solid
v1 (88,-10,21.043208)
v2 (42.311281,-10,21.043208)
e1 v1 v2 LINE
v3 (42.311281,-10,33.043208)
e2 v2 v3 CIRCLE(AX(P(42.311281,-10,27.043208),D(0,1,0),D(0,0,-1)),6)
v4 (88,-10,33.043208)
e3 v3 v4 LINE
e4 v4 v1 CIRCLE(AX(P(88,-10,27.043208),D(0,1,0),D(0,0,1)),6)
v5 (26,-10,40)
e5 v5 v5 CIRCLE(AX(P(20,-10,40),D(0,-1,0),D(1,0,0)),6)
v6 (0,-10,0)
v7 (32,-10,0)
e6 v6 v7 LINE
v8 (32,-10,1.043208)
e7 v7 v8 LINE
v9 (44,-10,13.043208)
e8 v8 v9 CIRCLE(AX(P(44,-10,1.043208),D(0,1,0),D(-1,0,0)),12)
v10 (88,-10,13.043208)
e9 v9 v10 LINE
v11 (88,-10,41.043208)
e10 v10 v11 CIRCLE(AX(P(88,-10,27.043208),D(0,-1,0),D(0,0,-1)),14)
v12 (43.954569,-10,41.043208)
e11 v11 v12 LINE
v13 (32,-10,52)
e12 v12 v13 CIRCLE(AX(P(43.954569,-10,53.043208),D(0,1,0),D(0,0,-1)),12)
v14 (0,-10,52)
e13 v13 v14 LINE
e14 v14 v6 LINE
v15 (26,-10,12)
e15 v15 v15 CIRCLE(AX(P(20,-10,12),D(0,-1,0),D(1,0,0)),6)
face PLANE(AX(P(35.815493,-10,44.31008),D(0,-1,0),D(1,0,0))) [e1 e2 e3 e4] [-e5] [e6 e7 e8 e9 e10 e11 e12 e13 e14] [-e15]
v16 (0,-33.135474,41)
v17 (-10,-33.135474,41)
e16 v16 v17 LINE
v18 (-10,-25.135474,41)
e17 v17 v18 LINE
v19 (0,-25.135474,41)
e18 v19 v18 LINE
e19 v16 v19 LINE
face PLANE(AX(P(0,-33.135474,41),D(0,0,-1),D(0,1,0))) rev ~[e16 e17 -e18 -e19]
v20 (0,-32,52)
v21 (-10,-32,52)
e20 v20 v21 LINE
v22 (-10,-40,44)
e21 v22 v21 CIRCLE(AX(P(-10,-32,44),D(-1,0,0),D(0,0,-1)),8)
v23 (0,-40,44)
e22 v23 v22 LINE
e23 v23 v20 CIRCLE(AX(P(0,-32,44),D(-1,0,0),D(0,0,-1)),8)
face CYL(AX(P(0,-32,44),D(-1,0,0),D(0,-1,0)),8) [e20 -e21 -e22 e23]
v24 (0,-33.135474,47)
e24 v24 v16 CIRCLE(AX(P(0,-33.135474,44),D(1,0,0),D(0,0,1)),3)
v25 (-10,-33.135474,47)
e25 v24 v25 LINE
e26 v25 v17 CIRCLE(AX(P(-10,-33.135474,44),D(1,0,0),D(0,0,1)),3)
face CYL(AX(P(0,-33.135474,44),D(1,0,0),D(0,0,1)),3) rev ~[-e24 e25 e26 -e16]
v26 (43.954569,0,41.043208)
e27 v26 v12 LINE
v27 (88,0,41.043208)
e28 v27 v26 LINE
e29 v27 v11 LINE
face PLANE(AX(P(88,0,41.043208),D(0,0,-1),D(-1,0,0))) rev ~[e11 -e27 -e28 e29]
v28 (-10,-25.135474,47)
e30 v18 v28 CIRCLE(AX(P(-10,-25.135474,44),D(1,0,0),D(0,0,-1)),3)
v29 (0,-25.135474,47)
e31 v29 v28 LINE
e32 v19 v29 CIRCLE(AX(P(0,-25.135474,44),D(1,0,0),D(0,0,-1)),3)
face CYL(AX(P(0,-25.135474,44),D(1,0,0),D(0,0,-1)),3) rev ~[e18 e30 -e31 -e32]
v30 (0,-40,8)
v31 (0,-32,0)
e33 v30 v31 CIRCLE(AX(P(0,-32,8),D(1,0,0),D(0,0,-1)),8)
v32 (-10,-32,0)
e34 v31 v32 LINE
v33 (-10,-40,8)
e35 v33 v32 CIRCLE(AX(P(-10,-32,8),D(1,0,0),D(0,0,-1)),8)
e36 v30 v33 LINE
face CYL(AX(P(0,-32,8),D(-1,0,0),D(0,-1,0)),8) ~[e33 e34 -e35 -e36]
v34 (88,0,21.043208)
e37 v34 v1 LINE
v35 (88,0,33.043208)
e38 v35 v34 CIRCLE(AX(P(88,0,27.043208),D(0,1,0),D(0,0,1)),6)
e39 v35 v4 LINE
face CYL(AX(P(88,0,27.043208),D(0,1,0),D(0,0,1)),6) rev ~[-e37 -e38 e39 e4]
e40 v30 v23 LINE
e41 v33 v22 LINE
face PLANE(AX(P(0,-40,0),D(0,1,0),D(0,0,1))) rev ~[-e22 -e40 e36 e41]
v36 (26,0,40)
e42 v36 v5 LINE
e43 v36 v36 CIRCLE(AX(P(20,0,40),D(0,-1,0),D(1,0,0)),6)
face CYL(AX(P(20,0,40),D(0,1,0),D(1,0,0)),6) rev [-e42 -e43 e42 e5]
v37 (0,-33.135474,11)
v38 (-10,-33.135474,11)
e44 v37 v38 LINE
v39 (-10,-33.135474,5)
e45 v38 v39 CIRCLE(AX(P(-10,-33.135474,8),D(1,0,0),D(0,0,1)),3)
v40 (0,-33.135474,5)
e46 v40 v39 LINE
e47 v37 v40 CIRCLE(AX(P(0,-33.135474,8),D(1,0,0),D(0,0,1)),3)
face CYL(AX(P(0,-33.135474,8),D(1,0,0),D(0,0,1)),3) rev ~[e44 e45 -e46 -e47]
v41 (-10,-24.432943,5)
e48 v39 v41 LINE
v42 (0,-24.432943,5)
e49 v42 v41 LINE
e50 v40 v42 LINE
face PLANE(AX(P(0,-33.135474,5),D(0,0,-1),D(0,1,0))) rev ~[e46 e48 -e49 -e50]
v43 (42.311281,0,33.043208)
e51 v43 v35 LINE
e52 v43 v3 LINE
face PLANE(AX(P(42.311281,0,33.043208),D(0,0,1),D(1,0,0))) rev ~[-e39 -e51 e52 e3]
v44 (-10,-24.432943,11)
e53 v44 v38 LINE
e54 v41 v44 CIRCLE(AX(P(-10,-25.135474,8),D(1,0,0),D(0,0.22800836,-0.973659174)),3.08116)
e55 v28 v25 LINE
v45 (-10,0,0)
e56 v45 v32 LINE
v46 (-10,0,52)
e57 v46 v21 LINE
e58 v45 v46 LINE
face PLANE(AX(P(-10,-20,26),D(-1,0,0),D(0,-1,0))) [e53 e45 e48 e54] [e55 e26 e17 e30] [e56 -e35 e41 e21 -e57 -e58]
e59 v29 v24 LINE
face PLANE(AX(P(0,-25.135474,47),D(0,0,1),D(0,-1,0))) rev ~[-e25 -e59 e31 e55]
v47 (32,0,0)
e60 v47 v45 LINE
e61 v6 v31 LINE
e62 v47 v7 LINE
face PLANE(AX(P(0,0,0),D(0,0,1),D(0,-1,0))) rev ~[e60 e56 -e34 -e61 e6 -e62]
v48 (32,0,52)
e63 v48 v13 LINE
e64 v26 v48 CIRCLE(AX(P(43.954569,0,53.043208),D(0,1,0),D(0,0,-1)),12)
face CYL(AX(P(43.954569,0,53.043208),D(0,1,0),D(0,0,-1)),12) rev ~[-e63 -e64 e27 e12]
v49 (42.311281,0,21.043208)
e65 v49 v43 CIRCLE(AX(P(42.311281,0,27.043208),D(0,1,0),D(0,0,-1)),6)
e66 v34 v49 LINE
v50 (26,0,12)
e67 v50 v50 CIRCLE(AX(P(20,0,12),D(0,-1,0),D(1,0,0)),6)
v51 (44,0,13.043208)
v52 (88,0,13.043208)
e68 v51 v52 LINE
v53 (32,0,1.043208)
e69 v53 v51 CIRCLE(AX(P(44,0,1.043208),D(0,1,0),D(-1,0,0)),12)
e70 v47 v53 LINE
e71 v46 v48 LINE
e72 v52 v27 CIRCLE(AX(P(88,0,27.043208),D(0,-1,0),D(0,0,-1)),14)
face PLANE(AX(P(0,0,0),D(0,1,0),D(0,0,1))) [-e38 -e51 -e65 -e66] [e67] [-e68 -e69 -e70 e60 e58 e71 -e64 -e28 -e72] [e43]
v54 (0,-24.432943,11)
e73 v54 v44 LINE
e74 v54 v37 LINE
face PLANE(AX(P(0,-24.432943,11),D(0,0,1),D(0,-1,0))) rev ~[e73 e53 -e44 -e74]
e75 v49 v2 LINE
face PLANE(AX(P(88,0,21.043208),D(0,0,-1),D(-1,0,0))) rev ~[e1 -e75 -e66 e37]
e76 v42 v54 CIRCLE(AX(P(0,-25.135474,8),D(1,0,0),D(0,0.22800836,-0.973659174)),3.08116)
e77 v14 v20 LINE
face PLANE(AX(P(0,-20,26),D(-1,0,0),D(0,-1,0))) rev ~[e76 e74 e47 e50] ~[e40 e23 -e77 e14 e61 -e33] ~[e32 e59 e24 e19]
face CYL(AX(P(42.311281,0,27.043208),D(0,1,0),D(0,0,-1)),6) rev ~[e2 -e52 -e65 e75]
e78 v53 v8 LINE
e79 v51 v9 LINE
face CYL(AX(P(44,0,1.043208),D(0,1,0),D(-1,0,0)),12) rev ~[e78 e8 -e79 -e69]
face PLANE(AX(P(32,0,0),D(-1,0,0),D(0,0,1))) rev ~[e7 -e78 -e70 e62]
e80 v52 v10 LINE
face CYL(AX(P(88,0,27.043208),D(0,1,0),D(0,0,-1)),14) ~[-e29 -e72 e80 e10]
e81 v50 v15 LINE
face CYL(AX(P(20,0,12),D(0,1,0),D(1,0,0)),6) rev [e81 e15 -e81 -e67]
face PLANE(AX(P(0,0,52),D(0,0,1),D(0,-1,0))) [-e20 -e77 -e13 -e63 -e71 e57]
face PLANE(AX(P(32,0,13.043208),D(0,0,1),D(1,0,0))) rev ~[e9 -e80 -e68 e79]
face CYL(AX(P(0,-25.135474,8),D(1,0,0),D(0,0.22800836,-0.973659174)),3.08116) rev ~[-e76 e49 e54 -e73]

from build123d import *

# Parameters (mm, degrees)
F0_R        = 6
F1_DEPTH    = 10
F2_T1_DEPTH = 10
F3_W        = 40
F3_H        = 52
F4_DEPTH    = 10
F5_R        = 8


# Not quite as in the source:
# - a fillet or chamfer that OpenCascade refuses, or shapes differently, is made with other operations: its cross-section is extruded or revolved along the edge and cut away or added


with BuildPart() as f1:
    # F0 (on Front) → F1 (new body)
    with BuildSketch(Plane.XZ):
        with BuildLine():
            Line((32, 52), (0, 52))
            Line((0, 52), (0, 0))
            Line((0, 0), (32, 0))
            Line((32, 0), (32, 13.0432075486))
            Line((32, 13.0432075486), (88, 13.0432075486))
            ThreePointArc((88, 13.0432075486), (102, 27.0432075486), (88, 41.0432075486))
            Line((88, 41.0432075486), (32, 41.0432075486))
            Line((32, 41.0432075486), (32, 52))
        make_face()
        with Locations((20, 12)):
            Circle(F0_R, mode=Mode.SUBTRACT)
        with Locations((20, 40)):
            Circle(F0_R, mode=Mode.SUBTRACT)
        with BuildLine():
            ThreePointArc((88, 33.0432075486), (94, 27.0432075486), (88, 21.0432075486))
            Line((88, 21.0432075486), (42.3112809658, 21.0432075486))
            ThreePointArc((42.3112809658, 21.0432075486), (36.3112809658, 27.0432075486), (42.3112809658, 33.0432075486))
            Line((42.3112809658, 33.0432075486), (88, 33.0432075486))
        make_face(mode=Mode.SUBTRACT)
    extrude(amount=F1_DEPTH)

    # F2: fillet of radius 12 on 2 edges, made by hand

    # F2_s2 → F2_t1 (join)
    with BuildSketch(Plane.XZ):
        with BuildLine():
            ThreePointArc((43.9545689178, 41.0432075486), (35.8465016568, 44.1967819828), (32, 52))
            Line((32, 52), (32, 41.0432075486))
            Line((32, 41.0432075486), (43.9545689178, 41.0432075486))
        make_face()
        with BuildLine():
            ThreePointArc((32, 1.0432075486), (35.5147186258, 9.5284889228), (44, 13.0432075486))
            Line((44, 13.0432075486), (32, 13.0432075486))
            Line((32, 13.0432075486), (32, 1.0432075486))
        make_face()
    extrude(amount=F2_T1_DEPTH)

    # F3 (on face) → F4 (join)
    with BuildSketch(Plane(origin=(0, 0, 0), x_dir=(0, -1, 0), z_dir=(-1, 0, 0))):
        with Locations((20, 26)):
            Rectangle(F3_W, F3_H)
        with BuildLine():
            ThreePointArc((33.1354735655, 11), (36.1354735655, 8), (33.1354735655, 5))
            Line((33.1354735655, 5), (24.4329432571, 5))
            ThreePointArc((24.4329432571, 5), (22.054313259, 8), (24.4329432571, 11))
            Line((24.4329432571, 11), (33.1354735655, 11))
        make_face(mode=Mode.SUBTRACT)
        with BuildLine():
            ThreePointArc((33.1354735655, 47), (36.1354735655, 44), (33.1354735655, 41))
            Line((33.1354735655, 41), (25.1354735655, 41))
            ThreePointArc((25.1354735655, 41), (22.1354735655, 44), (25.1354735655, 47))
            Line((25.1354735655, 47), (33.1354735655, 47))
        make_face(mode=Mode.SUBTRACT)
    extrude(amount=F4_DEPTH)

    # F5
    f5_edges = [f1.edges().sort_by_distance(p)[0] for p in [
        (-5, -40, 52),
        (-5, -40, 0),
    ]]
    fillet(f5_edges, radius=F5_R)


solid = f1.part
